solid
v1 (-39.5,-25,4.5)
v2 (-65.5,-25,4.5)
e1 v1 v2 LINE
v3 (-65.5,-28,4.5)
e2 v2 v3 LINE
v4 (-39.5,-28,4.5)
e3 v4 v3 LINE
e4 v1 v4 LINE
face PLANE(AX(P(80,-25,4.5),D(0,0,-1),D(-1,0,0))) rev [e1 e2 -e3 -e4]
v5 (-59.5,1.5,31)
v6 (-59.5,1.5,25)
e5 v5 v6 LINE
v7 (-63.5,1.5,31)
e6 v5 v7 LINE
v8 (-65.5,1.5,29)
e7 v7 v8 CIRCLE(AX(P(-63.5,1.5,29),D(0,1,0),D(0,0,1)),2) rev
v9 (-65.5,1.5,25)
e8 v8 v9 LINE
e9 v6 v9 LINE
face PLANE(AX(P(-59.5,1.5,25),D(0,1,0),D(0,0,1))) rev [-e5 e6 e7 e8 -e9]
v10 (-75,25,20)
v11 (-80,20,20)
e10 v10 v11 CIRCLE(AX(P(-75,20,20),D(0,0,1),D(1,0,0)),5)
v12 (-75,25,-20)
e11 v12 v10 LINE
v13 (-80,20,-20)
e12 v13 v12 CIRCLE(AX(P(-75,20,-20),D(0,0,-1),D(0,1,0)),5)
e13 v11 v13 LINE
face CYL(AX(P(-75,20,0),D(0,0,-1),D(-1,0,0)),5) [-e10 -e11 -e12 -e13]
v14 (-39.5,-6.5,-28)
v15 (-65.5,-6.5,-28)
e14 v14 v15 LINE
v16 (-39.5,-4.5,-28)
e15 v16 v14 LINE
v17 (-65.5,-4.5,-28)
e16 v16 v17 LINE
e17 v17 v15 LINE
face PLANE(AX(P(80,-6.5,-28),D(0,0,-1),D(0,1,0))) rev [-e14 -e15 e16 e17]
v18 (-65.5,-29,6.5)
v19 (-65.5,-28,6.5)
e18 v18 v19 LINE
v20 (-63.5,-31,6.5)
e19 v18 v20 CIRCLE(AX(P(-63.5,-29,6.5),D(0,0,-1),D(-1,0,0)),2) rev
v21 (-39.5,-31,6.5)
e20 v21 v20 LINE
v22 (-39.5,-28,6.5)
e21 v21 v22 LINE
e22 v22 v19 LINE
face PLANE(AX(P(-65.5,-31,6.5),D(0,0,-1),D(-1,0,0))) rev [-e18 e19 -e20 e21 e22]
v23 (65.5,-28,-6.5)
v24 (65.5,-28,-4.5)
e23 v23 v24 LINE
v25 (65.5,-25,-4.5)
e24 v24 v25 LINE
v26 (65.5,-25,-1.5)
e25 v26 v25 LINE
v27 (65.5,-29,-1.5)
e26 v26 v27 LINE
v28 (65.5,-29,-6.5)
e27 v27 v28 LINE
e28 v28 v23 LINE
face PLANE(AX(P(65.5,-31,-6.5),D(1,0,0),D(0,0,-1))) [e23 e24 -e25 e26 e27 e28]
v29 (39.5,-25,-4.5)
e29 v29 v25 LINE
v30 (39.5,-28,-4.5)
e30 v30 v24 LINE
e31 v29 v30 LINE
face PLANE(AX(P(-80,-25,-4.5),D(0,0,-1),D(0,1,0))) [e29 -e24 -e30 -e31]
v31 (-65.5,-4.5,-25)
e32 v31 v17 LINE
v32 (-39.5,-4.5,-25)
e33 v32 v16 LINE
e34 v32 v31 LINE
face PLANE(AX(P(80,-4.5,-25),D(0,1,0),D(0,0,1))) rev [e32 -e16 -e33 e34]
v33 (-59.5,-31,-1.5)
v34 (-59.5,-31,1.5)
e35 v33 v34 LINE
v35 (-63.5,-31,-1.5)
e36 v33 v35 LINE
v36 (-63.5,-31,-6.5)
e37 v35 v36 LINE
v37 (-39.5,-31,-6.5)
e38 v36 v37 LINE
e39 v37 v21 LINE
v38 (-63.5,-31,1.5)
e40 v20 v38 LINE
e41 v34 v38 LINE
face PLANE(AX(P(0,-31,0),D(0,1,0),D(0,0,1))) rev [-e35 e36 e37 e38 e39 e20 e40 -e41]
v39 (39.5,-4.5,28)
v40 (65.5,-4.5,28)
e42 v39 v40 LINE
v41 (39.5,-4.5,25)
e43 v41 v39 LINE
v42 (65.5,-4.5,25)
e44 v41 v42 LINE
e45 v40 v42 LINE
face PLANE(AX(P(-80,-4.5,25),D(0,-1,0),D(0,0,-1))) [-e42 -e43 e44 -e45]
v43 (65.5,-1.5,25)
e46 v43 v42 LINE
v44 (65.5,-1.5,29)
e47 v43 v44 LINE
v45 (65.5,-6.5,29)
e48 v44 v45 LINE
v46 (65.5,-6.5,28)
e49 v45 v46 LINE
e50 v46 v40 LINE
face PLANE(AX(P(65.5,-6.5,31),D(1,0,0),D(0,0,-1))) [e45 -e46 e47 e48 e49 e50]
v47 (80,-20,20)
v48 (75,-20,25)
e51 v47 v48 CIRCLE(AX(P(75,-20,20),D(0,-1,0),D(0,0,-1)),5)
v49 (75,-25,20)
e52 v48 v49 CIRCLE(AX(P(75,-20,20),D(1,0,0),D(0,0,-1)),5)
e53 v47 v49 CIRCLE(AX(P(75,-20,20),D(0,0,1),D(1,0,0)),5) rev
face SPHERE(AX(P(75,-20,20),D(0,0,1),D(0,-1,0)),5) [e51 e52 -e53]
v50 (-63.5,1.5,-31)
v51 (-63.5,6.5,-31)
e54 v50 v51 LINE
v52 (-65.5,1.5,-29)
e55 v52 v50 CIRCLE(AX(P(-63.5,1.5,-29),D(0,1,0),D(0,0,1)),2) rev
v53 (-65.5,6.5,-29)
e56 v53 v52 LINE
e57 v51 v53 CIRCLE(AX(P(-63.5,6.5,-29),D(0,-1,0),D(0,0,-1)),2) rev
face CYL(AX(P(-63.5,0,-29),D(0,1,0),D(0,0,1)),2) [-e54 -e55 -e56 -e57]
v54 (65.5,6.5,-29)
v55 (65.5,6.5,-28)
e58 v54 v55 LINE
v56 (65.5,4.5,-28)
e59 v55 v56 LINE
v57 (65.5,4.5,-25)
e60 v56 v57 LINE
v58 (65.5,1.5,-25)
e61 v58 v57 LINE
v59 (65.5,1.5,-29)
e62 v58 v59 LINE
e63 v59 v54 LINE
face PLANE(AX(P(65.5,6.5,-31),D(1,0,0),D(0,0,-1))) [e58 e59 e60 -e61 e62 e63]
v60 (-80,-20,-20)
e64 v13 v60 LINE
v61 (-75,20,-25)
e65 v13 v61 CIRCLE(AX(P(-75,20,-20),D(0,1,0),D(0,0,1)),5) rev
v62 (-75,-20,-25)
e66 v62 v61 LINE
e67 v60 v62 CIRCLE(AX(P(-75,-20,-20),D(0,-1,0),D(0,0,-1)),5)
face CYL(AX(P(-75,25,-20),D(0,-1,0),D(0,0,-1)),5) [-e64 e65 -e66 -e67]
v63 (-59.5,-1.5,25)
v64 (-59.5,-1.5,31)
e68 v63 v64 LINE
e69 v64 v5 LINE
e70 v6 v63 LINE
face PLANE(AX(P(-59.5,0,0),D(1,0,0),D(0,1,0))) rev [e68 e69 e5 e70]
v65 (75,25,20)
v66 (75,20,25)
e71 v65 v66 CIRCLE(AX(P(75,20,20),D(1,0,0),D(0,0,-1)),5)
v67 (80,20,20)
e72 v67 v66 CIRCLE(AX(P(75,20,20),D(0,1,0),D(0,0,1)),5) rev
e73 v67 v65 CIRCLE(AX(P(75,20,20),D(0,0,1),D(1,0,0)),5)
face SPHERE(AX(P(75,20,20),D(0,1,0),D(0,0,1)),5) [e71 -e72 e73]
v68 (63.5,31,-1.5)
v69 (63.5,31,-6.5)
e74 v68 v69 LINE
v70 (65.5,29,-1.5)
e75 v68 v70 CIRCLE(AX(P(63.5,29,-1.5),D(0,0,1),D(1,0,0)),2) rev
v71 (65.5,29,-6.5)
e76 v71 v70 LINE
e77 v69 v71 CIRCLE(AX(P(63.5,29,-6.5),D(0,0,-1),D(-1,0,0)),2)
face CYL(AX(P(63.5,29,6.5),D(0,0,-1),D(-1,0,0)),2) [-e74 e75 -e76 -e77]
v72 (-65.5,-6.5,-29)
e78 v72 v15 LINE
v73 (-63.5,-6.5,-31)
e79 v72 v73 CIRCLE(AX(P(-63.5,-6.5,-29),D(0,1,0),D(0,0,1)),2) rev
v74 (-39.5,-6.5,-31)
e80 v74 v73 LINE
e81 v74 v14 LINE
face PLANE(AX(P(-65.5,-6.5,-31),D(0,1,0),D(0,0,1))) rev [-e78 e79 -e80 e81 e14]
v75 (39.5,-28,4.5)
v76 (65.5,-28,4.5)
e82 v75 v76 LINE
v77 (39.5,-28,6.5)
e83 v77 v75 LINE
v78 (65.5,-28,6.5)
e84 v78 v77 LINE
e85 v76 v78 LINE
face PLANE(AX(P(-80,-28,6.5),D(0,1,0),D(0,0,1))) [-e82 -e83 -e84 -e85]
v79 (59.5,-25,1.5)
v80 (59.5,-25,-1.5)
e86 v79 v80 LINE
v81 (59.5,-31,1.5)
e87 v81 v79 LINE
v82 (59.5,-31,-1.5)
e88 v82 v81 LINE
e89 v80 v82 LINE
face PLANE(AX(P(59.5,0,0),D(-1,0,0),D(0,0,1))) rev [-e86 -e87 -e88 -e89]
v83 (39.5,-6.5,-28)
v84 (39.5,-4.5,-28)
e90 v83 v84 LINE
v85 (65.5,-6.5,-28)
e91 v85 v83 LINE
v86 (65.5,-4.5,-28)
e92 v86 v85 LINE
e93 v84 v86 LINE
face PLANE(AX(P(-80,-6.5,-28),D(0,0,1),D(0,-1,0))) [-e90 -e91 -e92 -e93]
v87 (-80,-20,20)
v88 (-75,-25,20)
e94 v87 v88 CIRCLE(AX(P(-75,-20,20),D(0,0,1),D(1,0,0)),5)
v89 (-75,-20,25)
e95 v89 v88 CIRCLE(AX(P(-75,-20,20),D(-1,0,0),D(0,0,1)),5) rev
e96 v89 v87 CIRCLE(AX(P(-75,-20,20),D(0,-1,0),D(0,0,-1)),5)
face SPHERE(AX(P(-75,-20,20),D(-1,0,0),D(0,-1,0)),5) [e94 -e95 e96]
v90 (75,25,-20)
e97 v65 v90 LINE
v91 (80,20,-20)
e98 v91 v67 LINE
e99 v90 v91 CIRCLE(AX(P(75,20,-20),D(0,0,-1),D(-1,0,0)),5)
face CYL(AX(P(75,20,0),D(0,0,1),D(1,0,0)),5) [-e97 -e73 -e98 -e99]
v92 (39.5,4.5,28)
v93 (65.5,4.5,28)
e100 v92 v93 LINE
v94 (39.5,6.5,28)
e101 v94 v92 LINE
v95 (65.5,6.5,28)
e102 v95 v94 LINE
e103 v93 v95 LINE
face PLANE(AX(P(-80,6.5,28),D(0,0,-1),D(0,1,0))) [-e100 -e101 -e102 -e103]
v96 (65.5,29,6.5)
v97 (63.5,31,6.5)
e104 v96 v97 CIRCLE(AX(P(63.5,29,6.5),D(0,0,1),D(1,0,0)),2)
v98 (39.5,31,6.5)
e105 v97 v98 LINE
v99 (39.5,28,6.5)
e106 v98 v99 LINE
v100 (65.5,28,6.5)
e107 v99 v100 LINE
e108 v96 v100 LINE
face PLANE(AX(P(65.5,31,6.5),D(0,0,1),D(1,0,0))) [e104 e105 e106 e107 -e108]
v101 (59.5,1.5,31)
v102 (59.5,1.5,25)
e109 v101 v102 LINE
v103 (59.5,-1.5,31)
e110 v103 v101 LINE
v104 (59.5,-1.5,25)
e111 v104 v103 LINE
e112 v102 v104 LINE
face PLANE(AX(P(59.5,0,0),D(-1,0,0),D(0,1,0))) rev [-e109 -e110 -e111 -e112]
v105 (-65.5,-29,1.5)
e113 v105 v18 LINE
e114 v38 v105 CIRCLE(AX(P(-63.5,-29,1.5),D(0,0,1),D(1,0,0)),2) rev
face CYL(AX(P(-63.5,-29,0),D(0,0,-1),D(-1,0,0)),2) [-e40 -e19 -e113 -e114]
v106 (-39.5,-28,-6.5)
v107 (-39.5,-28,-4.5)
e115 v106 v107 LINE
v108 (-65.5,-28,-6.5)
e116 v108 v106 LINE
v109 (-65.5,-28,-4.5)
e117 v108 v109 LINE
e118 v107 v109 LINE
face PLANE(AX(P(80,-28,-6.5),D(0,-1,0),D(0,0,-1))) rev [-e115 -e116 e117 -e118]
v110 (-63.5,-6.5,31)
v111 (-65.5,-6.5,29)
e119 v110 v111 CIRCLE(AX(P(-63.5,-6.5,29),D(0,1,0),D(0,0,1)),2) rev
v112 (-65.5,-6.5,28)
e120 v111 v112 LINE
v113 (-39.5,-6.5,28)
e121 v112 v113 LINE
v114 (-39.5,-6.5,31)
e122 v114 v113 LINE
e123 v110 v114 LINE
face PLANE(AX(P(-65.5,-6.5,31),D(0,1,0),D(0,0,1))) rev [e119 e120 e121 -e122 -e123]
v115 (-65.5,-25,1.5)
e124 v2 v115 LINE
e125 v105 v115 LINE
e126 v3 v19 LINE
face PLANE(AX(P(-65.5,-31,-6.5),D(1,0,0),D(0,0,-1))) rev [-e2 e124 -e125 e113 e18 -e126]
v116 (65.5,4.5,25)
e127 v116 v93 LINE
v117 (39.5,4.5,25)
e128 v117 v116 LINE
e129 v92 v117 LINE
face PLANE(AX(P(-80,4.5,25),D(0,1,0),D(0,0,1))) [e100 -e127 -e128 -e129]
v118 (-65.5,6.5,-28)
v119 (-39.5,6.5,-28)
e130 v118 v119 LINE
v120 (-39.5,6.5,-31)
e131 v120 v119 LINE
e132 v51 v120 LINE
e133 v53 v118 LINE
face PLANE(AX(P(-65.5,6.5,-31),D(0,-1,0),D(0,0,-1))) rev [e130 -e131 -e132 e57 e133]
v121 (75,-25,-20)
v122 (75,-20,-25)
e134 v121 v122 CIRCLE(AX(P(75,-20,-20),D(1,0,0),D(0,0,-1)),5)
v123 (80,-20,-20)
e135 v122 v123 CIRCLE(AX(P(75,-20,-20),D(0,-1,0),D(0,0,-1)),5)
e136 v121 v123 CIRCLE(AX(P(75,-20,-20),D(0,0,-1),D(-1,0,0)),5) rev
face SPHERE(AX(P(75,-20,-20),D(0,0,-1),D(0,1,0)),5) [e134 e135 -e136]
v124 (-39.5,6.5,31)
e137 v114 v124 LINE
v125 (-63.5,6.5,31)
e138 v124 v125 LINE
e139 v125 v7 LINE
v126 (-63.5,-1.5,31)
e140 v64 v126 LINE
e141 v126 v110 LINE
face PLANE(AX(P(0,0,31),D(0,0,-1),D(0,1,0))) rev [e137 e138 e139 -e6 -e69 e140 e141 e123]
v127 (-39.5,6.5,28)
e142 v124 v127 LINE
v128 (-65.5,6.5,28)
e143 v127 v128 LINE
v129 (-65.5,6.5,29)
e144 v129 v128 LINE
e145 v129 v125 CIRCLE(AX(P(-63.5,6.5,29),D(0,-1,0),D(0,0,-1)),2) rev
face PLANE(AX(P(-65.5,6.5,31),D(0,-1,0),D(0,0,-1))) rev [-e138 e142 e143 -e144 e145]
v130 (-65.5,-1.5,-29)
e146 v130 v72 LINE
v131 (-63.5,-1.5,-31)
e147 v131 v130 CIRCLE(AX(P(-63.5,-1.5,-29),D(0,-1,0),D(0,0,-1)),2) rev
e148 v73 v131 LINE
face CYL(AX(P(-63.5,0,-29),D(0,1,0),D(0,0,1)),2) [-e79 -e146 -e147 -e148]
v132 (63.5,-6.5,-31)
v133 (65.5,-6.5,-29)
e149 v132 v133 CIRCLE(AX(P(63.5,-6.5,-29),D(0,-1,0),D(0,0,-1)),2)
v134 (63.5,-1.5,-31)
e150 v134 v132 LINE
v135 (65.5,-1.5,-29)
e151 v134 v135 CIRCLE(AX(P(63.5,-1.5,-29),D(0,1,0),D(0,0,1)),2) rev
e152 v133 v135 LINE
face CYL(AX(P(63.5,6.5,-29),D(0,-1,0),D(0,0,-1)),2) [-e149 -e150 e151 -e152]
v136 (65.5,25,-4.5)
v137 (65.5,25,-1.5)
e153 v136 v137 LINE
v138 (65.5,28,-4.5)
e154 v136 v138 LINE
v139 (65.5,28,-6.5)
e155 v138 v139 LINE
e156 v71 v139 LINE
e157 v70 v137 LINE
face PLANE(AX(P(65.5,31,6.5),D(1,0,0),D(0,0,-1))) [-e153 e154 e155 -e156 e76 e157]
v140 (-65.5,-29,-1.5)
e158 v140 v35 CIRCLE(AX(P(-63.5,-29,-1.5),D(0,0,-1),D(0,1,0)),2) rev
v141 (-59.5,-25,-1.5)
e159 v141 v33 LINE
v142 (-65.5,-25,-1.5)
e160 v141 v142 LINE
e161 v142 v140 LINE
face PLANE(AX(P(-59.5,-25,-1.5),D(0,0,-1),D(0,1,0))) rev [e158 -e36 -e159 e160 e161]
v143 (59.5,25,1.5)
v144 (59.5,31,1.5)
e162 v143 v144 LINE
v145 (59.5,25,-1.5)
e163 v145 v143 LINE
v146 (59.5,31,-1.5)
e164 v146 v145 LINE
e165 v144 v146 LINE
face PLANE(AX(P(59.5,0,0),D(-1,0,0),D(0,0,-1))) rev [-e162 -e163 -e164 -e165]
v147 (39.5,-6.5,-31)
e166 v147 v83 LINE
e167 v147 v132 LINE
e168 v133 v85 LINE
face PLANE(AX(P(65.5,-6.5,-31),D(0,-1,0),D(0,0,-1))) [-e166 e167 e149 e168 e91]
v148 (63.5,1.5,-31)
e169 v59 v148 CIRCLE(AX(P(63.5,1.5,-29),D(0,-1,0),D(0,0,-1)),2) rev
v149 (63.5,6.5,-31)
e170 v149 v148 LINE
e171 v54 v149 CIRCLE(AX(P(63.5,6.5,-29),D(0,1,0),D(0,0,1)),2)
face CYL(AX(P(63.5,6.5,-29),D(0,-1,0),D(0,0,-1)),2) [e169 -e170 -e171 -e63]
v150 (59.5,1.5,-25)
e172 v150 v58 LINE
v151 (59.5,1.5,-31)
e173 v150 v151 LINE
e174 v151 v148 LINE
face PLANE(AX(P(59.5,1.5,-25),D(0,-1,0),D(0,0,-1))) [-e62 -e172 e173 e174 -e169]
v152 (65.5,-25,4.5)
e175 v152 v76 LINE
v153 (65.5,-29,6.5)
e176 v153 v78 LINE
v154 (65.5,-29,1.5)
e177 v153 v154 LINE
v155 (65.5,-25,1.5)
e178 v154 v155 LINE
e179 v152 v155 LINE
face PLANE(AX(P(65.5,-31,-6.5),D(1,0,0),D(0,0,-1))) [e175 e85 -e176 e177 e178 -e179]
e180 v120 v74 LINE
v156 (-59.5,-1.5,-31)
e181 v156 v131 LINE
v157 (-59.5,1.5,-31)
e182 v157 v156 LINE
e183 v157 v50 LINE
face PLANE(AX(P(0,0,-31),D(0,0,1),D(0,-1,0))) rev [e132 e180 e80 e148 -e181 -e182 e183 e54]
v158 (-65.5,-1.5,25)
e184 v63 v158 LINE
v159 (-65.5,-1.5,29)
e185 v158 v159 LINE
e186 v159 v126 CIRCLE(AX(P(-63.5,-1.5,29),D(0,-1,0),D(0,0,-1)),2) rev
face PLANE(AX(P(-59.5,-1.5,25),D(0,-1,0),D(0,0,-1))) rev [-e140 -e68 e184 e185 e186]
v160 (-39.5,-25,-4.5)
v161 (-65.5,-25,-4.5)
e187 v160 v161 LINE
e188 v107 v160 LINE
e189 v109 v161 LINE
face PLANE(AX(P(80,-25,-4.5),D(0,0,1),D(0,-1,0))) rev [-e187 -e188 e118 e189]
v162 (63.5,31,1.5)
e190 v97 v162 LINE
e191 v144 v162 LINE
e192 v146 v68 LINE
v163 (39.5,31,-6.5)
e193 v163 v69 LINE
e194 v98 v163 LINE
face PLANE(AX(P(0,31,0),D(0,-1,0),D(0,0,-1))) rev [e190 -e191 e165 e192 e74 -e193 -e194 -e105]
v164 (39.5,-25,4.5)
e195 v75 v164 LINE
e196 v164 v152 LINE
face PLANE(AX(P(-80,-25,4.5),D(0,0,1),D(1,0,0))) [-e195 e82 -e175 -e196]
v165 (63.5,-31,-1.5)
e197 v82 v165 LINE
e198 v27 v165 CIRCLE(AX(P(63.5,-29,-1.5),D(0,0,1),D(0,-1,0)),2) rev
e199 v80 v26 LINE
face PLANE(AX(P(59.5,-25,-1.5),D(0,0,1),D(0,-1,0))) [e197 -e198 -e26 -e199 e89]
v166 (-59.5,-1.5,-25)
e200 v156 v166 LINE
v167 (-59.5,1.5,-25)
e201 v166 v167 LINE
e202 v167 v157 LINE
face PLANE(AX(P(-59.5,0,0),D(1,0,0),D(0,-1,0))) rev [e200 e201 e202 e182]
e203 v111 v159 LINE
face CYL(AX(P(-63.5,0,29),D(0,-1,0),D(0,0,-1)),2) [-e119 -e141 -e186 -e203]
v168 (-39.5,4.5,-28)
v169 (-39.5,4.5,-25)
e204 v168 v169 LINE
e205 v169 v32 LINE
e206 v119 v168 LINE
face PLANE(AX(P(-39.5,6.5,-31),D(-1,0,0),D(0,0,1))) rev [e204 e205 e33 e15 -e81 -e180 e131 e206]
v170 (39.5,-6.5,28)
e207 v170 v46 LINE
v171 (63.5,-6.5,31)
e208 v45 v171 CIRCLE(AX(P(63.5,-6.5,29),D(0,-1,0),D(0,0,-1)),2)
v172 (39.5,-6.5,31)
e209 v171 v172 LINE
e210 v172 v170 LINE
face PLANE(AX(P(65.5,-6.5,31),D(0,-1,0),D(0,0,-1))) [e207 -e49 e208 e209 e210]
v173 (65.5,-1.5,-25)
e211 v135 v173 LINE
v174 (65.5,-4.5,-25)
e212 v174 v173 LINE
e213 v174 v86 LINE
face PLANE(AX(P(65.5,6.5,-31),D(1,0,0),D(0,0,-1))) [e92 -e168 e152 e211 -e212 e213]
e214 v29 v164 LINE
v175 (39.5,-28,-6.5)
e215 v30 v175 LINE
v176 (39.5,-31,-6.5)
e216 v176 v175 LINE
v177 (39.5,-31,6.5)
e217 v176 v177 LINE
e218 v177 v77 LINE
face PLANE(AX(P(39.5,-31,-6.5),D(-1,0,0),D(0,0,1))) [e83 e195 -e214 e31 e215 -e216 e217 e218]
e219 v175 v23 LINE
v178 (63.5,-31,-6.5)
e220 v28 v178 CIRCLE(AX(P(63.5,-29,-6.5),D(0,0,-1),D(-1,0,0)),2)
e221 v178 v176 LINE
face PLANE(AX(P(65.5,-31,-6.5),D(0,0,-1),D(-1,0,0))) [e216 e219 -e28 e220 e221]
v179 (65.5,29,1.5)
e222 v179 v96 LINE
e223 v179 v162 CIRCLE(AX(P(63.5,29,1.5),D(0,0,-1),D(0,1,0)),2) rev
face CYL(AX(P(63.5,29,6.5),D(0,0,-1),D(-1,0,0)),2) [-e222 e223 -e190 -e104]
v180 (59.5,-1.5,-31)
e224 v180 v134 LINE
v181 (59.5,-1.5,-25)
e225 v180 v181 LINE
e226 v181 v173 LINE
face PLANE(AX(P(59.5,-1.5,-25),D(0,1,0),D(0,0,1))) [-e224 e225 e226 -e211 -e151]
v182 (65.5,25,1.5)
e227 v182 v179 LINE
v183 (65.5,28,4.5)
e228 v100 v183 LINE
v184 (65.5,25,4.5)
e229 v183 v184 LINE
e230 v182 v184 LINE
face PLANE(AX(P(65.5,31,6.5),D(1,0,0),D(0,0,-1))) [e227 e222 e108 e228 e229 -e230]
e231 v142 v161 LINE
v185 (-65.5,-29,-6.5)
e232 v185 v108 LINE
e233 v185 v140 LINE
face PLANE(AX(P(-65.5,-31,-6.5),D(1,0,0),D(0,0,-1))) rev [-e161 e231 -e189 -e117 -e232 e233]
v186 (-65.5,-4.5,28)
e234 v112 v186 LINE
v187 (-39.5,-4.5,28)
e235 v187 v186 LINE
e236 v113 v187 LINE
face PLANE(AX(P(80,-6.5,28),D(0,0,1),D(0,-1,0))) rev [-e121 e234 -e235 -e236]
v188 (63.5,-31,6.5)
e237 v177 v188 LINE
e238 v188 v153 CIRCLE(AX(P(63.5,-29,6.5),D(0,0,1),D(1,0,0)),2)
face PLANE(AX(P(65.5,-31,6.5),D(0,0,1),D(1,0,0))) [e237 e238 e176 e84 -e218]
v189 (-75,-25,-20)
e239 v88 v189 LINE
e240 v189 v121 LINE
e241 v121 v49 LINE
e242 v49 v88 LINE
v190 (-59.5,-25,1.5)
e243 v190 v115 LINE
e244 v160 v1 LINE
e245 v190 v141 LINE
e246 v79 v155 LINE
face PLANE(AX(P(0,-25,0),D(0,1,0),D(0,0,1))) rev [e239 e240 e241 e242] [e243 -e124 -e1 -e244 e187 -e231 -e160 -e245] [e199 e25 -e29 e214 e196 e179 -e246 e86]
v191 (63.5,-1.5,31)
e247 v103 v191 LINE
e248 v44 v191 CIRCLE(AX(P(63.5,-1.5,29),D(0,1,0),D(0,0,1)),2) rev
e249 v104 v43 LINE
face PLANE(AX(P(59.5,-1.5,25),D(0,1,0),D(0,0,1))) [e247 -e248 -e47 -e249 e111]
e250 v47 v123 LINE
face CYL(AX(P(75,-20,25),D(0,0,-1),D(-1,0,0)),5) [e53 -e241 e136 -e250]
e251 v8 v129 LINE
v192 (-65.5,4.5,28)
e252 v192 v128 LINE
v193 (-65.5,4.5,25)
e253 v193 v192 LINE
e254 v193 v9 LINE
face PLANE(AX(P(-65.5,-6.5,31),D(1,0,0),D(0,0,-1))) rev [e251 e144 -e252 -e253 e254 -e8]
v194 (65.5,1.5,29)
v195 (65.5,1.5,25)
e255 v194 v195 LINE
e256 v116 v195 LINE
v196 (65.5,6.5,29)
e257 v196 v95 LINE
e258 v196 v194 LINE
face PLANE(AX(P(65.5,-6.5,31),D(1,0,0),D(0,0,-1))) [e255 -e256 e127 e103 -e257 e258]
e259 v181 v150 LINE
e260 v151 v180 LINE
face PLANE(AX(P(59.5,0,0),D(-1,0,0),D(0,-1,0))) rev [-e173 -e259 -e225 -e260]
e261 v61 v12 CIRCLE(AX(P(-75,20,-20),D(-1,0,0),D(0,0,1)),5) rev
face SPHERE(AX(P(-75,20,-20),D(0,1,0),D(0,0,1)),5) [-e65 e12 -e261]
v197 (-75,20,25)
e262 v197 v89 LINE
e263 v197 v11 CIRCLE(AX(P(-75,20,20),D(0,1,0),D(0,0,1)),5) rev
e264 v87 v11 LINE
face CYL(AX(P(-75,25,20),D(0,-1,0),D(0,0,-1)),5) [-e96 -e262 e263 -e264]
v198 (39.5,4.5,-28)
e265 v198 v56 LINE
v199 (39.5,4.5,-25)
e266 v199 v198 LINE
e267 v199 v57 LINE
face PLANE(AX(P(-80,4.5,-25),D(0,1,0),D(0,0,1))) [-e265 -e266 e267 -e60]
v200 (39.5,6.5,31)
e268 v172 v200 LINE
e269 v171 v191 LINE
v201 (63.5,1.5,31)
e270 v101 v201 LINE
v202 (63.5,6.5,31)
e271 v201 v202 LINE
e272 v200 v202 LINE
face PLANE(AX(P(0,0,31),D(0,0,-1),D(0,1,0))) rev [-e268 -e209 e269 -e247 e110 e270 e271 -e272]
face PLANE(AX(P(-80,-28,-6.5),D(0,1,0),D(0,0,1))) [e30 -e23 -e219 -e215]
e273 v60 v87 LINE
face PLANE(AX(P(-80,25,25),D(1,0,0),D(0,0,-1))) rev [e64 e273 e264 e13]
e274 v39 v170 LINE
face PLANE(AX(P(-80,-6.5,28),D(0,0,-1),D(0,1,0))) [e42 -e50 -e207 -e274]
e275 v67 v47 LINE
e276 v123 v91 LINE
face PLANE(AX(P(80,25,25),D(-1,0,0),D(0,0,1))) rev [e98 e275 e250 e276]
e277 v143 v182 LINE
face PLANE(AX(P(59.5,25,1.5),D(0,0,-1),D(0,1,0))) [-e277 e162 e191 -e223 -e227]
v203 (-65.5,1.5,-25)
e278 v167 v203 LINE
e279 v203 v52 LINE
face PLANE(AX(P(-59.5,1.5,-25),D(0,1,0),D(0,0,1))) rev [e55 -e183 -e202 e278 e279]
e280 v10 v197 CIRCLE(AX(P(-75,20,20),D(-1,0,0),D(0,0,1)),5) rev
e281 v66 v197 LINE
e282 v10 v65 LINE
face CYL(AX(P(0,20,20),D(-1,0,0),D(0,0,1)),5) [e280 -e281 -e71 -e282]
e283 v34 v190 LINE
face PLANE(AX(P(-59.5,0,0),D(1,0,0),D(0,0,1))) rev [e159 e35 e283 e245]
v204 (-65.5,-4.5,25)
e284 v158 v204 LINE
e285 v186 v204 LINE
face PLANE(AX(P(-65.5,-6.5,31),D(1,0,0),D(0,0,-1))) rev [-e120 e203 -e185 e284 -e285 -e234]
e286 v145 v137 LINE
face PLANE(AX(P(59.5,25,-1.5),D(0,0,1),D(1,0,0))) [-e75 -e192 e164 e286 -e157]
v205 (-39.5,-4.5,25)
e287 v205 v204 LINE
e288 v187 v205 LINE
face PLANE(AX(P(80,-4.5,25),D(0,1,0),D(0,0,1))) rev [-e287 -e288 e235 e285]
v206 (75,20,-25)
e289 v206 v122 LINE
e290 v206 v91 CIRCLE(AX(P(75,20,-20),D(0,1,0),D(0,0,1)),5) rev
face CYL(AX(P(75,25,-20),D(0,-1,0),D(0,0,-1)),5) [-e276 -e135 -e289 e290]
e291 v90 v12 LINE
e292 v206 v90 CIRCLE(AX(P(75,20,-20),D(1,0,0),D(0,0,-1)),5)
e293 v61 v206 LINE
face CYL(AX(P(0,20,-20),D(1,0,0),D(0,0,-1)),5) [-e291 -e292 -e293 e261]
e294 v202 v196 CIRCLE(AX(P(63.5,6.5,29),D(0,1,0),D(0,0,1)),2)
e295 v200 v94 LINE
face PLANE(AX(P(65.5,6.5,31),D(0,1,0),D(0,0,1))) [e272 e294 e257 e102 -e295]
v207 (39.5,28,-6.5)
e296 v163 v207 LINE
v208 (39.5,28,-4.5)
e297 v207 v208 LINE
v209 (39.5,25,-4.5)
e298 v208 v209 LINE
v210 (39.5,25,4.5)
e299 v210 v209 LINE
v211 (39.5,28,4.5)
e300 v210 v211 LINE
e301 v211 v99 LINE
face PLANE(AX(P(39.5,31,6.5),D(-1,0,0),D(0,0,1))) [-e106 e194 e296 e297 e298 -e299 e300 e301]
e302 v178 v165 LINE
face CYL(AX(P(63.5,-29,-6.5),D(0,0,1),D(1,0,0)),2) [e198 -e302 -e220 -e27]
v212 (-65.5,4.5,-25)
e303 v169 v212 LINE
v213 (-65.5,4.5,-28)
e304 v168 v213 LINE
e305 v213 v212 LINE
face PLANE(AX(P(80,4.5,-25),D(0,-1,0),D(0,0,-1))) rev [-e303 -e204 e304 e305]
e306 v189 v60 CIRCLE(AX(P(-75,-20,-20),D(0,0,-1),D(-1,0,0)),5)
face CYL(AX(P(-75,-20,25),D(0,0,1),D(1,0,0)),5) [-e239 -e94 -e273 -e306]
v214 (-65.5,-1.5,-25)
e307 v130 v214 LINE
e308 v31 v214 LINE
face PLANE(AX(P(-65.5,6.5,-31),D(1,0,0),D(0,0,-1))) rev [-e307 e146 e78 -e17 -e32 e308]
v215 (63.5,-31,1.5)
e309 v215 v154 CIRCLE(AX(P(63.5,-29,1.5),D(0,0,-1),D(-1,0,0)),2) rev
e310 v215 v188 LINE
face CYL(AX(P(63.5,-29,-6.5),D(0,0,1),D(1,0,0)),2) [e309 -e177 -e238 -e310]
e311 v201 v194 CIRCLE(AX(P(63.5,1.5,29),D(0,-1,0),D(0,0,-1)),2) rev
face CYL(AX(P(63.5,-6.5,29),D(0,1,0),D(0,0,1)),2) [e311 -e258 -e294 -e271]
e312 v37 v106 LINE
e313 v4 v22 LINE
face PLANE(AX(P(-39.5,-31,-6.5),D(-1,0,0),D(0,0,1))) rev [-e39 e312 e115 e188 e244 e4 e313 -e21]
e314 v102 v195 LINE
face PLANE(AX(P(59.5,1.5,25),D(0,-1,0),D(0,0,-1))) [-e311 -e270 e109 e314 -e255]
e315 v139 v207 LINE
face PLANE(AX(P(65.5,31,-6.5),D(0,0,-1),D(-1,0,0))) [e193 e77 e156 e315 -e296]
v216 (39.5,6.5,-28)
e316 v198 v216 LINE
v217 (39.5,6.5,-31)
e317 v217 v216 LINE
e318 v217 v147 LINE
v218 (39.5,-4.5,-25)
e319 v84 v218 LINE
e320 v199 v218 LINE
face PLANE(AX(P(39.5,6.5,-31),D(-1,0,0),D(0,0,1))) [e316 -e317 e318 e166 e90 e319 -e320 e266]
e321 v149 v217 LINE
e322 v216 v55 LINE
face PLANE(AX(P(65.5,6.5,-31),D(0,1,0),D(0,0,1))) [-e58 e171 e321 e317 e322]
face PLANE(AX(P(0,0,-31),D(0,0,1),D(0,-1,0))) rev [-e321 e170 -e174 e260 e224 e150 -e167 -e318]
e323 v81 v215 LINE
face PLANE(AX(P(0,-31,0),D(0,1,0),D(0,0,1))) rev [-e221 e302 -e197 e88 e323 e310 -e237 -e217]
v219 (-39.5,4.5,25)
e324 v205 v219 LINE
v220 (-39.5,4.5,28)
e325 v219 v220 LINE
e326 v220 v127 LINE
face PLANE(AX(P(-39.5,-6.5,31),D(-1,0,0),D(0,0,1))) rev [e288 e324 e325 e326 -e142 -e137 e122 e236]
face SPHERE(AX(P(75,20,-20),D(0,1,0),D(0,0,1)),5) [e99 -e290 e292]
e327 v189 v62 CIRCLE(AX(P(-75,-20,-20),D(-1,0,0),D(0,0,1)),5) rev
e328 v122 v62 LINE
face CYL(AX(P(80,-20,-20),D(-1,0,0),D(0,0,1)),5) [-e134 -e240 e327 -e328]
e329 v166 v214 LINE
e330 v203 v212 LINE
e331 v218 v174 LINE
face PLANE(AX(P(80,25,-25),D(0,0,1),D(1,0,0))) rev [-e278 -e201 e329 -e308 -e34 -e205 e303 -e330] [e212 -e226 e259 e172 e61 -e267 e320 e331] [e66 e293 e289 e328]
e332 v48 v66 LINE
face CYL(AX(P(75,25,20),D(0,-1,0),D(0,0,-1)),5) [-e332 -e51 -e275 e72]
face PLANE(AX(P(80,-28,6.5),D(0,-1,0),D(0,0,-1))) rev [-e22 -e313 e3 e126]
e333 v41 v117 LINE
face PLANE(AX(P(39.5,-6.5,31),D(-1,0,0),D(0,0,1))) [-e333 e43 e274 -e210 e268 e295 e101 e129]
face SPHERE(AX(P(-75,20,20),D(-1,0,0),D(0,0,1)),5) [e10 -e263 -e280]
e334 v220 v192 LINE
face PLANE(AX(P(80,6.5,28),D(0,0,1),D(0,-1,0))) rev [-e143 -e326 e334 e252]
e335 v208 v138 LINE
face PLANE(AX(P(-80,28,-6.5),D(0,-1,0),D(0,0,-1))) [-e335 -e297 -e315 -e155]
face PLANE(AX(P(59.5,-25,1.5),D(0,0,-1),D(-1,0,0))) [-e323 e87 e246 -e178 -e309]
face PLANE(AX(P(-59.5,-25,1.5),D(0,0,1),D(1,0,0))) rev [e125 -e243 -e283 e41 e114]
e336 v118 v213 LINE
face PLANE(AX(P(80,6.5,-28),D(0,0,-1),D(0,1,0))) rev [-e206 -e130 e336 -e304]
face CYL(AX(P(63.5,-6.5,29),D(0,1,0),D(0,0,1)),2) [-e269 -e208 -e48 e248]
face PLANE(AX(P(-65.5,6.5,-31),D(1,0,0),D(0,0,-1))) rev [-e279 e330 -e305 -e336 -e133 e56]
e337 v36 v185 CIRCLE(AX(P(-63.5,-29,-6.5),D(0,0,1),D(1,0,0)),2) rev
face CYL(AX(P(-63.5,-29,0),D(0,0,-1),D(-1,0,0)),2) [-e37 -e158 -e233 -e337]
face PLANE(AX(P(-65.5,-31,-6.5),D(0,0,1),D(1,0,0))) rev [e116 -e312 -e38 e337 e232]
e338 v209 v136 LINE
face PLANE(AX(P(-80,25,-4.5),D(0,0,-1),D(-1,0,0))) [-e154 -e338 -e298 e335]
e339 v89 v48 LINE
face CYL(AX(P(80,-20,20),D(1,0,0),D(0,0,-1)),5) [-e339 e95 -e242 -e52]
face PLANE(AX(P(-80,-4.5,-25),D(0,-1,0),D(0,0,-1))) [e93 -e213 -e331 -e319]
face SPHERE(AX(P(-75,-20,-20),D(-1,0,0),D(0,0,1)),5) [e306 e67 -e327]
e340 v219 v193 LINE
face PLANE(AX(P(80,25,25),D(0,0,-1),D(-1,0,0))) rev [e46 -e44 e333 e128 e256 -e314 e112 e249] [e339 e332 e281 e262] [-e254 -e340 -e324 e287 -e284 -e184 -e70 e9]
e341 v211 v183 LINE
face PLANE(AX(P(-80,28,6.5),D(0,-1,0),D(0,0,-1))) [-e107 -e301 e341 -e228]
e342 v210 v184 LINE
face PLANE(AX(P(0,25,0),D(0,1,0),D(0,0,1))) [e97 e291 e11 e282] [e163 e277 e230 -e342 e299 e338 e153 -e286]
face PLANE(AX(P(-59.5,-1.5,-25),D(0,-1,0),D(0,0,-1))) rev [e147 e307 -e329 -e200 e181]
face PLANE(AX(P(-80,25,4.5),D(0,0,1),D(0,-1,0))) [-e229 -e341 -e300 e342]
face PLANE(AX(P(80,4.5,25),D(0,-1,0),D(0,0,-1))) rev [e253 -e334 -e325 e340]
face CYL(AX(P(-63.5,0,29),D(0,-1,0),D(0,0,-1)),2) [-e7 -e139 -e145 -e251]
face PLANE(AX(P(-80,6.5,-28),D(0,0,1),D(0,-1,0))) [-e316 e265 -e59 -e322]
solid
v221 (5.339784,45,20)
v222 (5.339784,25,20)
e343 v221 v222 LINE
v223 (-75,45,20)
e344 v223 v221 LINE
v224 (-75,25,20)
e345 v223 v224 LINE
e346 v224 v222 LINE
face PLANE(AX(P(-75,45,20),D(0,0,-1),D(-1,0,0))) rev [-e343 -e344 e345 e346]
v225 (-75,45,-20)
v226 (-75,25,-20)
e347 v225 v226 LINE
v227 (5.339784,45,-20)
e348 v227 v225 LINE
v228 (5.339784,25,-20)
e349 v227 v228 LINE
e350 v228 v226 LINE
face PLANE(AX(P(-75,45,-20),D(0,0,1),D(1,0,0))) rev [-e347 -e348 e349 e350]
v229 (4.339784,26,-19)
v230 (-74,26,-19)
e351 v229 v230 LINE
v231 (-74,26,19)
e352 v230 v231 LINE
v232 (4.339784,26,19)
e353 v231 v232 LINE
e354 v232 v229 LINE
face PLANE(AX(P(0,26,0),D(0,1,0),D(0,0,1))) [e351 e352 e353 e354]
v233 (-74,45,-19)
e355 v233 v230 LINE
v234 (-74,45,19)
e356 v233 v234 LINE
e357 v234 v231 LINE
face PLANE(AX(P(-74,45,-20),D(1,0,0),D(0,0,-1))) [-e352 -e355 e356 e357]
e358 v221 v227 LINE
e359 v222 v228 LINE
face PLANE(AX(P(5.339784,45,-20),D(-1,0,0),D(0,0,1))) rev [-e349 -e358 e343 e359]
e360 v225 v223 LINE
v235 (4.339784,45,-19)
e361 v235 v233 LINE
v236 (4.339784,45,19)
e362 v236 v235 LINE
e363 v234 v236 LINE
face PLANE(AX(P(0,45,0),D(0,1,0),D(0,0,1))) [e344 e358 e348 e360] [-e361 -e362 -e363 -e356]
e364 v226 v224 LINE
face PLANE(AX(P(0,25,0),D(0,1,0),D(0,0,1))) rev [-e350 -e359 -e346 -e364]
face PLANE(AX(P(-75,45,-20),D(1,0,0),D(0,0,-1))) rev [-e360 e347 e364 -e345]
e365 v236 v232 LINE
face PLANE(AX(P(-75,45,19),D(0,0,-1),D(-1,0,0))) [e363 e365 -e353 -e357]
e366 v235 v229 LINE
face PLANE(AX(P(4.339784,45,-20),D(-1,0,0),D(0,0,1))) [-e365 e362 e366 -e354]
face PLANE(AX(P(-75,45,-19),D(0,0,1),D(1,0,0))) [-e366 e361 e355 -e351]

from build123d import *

# Parameters (mm, degrees)
SKETCH1_W               = 160
SKETCH1_H               = 50
BOSS_EXTRUDE1_DEPTH     = 25
SKETCH2_W               = 26
SKETCH2_H               = 13
CONNECTOR_BASE_DEPTH    = 6
SKETCH3_W               = 2
SKETCH3_H               = 3
DOVETAIL_CUT_DEPTH      = 151.851748415
FILLET1_R               = 2
SKETCH4_W               = 3
SKETCH4_H               = 6
CUT_EXTRUDE1_DEPTH      = 6
CIRPATTERN1_START       = -4.5
CIRPATTERN1_OUTLINE_W   = 20
CIRPATTERN1_OUTLINE_H   = 6
CIRPATTERN1_DEPTH       = 9
CIRPATTERN1_START_2     = -6.5
CIRPATTERN1_2_OUTLINE_W = 20
CIRPATTERN1_2_OUTLINE_H = 3
CIRPATTERN1_2_DEPTH     = 13
CIRPATTERN1_3_DEPTH     = 3
CIRPATTERN1_START_3     = 1.5
CIRPATTERN1_4_DEPTH     = 3
CIRPATTERN1_5_DEPTH     = 2
CIRPATTERN1_START_4     = 4.5
CIRPATTERN1_6_DEPTH     = 2
CIRPATTERN1_7_OUTLINE_W = 20
CIRPATTERN1_7_OUTLINE_H = 6
CIRPATTERN1_7_DEPTH     = 9
CIRPATTERN1_8_OUTLINE_W = 20
CIRPATTERN1_8_OUTLINE_H = 3
CIRPATTERN1_8_DEPTH     = 13
CIRPATTERN1_9_DEPTH     = 3
CIRPATTERN1_10_DEPTH    = 3
CIRPATTERN1_11_DEPTH    = 2
CIRPATTERN1_12_DEPTH    = 2
MIRROR1_START           = -4.5
MIRROR1_OUTLINE_W       = 20
MIRROR1_OUTLINE_H       = 6
MIRROR1_DEPTH           = 9
MIRROR1_START_2         = -6.5
MIRROR1_2_OUTLINE_W     = 20
MIRROR1_2_OUTLINE_H     = 3
MIRROR1_2_DEPTH         = 13
MIRROR1_3_DEPTH         = 3
MIRROR1_START_3         = 1.5
MIRROR1_4_DEPTH         = 3
MIRROR1_5_DEPTH         = 2
MIRROR1_START_4         = 4.5
MIRROR1_6_DEPTH         = 2
MIRROR1_7_OUTLINE_W     = 20
MIRROR1_7_OUTLINE_H     = 6
MIRROR1_7_DEPTH         = 9
MIRROR1_8_OUTLINE_W     = 20
MIRROR1_8_OUTLINE_H     = 3
MIRROR1_8_DEPTH         = 13
MIRROR1_9_DEPTH         = 3
MIRROR1_10_DEPTH        = 3
MIRROR1_11_DEPTH        = 2
MIRROR1_12_DEPTH        = 2
FILLET2_R               = 5
SKETCH5_W               = 26
SKETCH5_H               = 13
CUT_EXTRUDE2_DEPTH      = 103.454868113
SKETCH6_W               = 80.339783693
SKETCH6_H               = 40
BOSS_EXTRUDE2_DEPTH     = 20
SHELL1_T                = -1


# Read off the part's stored shape, not the designer's step: CirPattern1, Mirror1
with BuildPart() as part:
    # Sketch1 → Boss-Extrude1 (new, symmetric)
    with BuildSketch(Plane(origin=(0, 0, 0), x_dir=(1, 0, 0), z_dir=(0, 1, 0))):
        Rectangle(SKETCH1_W, SKETCH1_H)
    extrude(amount=BOSS_EXTRUDE1_DEPTH, both=True)

    # Sketch2 → connector base (add)
    with BuildSketch(Plane(origin=(0, 25, 0), x_dir=(1, 0, 0), z_dir=(0, 1, 0))):
        with Locations((-52.5, 0)):
            Rectangle(SKETCH2_W, SKETCH2_H)
    extrude(amount=CONNECTOR_BASE_DEPTH)

    # Sketch3 → dovetail cut (cut, through all)
    with BuildSketch(Plane.ZY.offset(65.5)):
        with Locations((5.5, 26.5)):
            Rectangle(SKETCH3_W, SKETCH3_H)
        with Locations((-5.5, 26.5)):
            Rectangle(SKETCH3_W, SKETCH3_H)
    extrude(amount=-DOVETAIL_CUT_DEPTH, mode=Mode.SUBTRACT)

    # Fillet1
    fillet1_edges = [part.edges().sort_by_distance(p)[0] for p in [
        (-65.5, 31, 0),
    ]]
    fillet(fillet1_edges, radius=FILLET1_R)

    # Sketch4 → Cut-Extrude1 (cut)
    with BuildSketch(Plane.ZY.offset(65.5)):
        with Locations((0, 28)):
            Rectangle(SKETCH4_W, SKETCH4_H)
    extrude(amount=-CUT_EXTRUDE1_DEPTH, mode=Mode.SUBTRACT)

    # CirPattern1 outline → CirPattern1 (add)
    with BuildSketch(Plane(origin=(0, 0, 0), x_dir=(1, 0, 0), z_dir=(0, 1, 0)).offset(CIRPATTERN1_START)):
        with Locations((-49.5, 28)):
            Rectangle(CIRPATTERN1_OUTLINE_W, CIRPATTERN1_OUTLINE_H)
        with Locations((-49.5, -28)):
            Rectangle(CIRPATTERN1_OUTLINE_W, CIRPATTERN1_OUTLINE_H)
    extrude(amount=CIRPATTERN1_DEPTH)

    # CirPattern1 2 outline → CirPattern1 2 (add)
    with BuildSketch(Plane(origin=(0, 0, 0), x_dir=(1, 0, 0), z_dir=(0, 1, 0)).offset(CIRPATTERN1_START_2)):
        with Locations((-49.5, 29.5)):
            Rectangle(CIRPATTERN1_2_OUTLINE_W, CIRPATTERN1_2_OUTLINE_H)
        with Locations((-49.5, -29.5)):
            Rectangle(CIRPATTERN1_2_OUTLINE_W, CIRPATTERN1_2_OUTLINE_H)
    extrude(amount=CIRPATTERN1_2_DEPTH)

    # CirPattern1 3 outline → CirPattern1 3 (add)
    with BuildSketch(Plane(origin=(0, 0, 0), x_dir=(1, 0, 0), z_dir=(0, 1, 0)).offset(CIRPATTERN1_START)):
        with BuildLine():
            Line((-65.5, 25), (-59.5, 25))
            Line((-59.5, 25), (-59.5, 31))
            Line((-59.5, 31), (-63.5, 31))
            ThreePointArc((-63.5, 31), (-64.914213562, 30.414213562), (-65.5, 29))
            Line((-65.5, 29), (-65.5, 25))
        make_face()
        with BuildLine():
            ThreePointArc((-65.5, -29), (-64.914213562, -30.414213562), (-63.5, -31))
            Line((-63.5, -31), (-59.5, -31))
            Line((-59.5, -31), (-59.5, -25))
            Line((-59.5, -25), (-65.5, -25))
            Line((-65.5, -25), (-65.5, -29))
        make_face()
    extrude(amount=CIRPATTERN1_3_DEPTH)

    # CirPattern1 4 outline → CirPattern1 4 (add)
    with BuildSketch(Plane(origin=(0, 0, 0), x_dir=(1, 0, 0), z_dir=(0, 1, 0)).offset(CIRPATTERN1_START_3)):
        with BuildLine():
            Line((-65.5, 25), (-59.5, 25))
            Line((-59.5, 25), (-59.5, 31))
            Line((-59.5, 31), (-63.5, 31))
            ThreePointArc((-63.5, 31), (-64.914213562, 30.414213562), (-65.5, 29))
            Line((-65.5, 29), (-65.5, 25))
        make_face()
        with BuildLine():
            ThreePointArc((-65.5, -29), (-64.914213562, -30.414213562), (-63.5, -31))
            Line((-63.5, -31), (-59.5, -31))
            Line((-59.5, -31), (-59.5, -25))
            Line((-59.5, -25), (-65.5, -25))
            Line((-65.5, -25), (-65.5, -29))
        make_face()
    extrude(amount=CIRPATTERN1_4_DEPTH)

    # CirPattern1 5 outline → CirPattern1 5 (add)
    with BuildSketch(Plane(origin=(0, 0, 0), x_dir=(1, 0, 0), z_dir=(0, 1, 0)).offset(CIRPATTERN1_START_2)):
        with BuildLine():
            Line((-65.5, 29), (-65.5, 28))
            Line((-65.5, 28), (-59.5, 28))
            Line((-59.5, 28), (-59.5, 31))
            Line((-59.5, 31), (-63.5, 31))
            ThreePointArc((-63.5, 31), (-64.914213562, 30.414213562), (-65.5, 29))
        make_face()
        with BuildLine():
            Line((-65.5, -28), (-65.5, -29))
            ThreePointArc((-65.5, -29), (-64.914213562, -30.414213562), (-63.5, -31))
            Line((-63.5, -31), (-59.5, -31))
            Line((-59.5, -31), (-59.5, -28))
            Line((-59.5, -28), (-65.5, -28))
        make_face()
    extrude(amount=CIRPATTERN1_5_DEPTH)

    # CirPattern1 6 outline → CirPattern1 6 (add)
    with BuildSketch(Plane(origin=(0, 0, 0), x_dir=(1, 0, 0), z_dir=(0, 1, 0)).offset(CIRPATTERN1_START_4)):
        with BuildLine():
            Line((-65.5, 29), (-65.5, 28))
            Line((-65.5, 28), (-59.5, 28))
            Line((-59.5, 28), (-59.5, 31))
            Line((-59.5, 31), (-63.5, 31))
            ThreePointArc((-63.5, 31), (-64.914213562, 30.414213562), (-65.5, 29))
        make_face()
        with BuildLine():
            Line((-65.5, -28), (-65.5, -29))
            ThreePointArc((-65.5, -29), (-64.914213562, -30.414213562), (-63.5, -31))
            Line((-63.5, -31), (-59.5, -31))
            Line((-59.5, -31), (-59.5, -28))
            Line((-59.5, -28), (-65.5, -28))
        make_face()
    extrude(amount=CIRPATTERN1_6_DEPTH)

    # CirPattern1 7 outline → CirPattern1 7 (add)
    with BuildSketch(Plane.XY.offset(CIRPATTERN1_START)):
        with Locations((-49.5, -28)):
            Rectangle(CIRPATTERN1_7_OUTLINE_W, CIRPATTERN1_7_OUTLINE_H)
    extrude(amount=CIRPATTERN1_7_DEPTH)

    # CirPattern1 8 outline → CirPattern1 8 (add)
    with BuildSketch(Plane.XY.offset(CIRPATTERN1_START_2)):
        with Locations((-49.5, -29.5)):
            Rectangle(CIRPATTERN1_8_OUTLINE_W, CIRPATTERN1_8_OUTLINE_H)
    extrude(amount=CIRPATTERN1_8_DEPTH)

    # CirPattern1 9 outline → CirPattern1 9 (add)
    with BuildSketch(Plane.XY.offset(CIRPATTERN1_START)):
        with BuildLine():
            ThreePointArc((-65.5, -29), (-64.914213562, -30.414213562), (-63.5, -31))
            Line((-63.5, -31), (-59.5, -31))
            Line((-59.5, -31), (-59.5, -25))
            Line((-59.5, -25), (-65.5, -25))
            Line((-65.5, -25), (-65.5, -29))
        make_face()
    extrude(amount=CIRPATTERN1_9_DEPTH)

    # CirPattern1 10 outline → CirPattern1 10 (add)
    with BuildSketch(Plane.XY.offset(CIRPATTERN1_START_3)):
        with BuildLine():
            ThreePointArc((-65.5, -29), (-64.914213562, -30.414213562), (-63.5, -31))
            Line((-63.5, -31), (-59.5, -31))
            Line((-59.5, -31), (-59.5, -25))
            Line((-59.5, -25), (-65.5, -25))
            Line((-65.5, -25), (-65.5, -29))
        make_face()
    extrude(amount=CIRPATTERN1_10_DEPTH)

    # CirPattern1 11 outline → CirPattern1 11 (add)
    with BuildSketch(Plane.XY.offset(CIRPATTERN1_START_2)):
        with BuildLine():
            Line((-65.5, -28), (-65.5, -29))
            ThreePointArc((-65.5, -29), (-64.914213562, -30.414213562), (-63.5, -31))
            Line((-63.5, -31), (-59.5, -31))
            Line((-59.5, -31), (-59.5, -28))
            Line((-59.5, -28), (-65.5, -28))
        make_face()
    extrude(amount=CIRPATTERN1_11_DEPTH)

    # CirPattern1 12 outline → CirPattern1 12 (add)
    with BuildSketch(Plane.XY.offset(CIRPATTERN1_START_4)):
        with BuildLine():
            Line((-65.5, -28), (-65.5, -29))
            ThreePointArc((-65.5, -29), (-64.914213562, -30.414213562), (-63.5, -31))
            Line((-63.5, -31), (-59.5, -31))
            Line((-59.5, -31), (-59.5, -28))
            Line((-59.5, -28), (-65.5, -28))
        make_face()
    extrude(amount=CIRPATTERN1_12_DEPTH)

    # Mirror1 outline → Mirror1 (add)
    with BuildSketch(Plane.XY.offset(MIRROR1_START)):
        with Locations((49.5, 28)):
            Rectangle(MIRROR1_OUTLINE_W, MIRROR1_OUTLINE_H)
        with Locations((49.5, -28)):
            Rectangle(MIRROR1_OUTLINE_W, MIRROR1_OUTLINE_H)
    extrude(amount=MIRROR1_DEPTH)

    # Mirror1 2 outline → Mirror1 2 (add)
    with BuildSketch(Plane.XY.offset(MIRROR1_START_2)):
        with Locations((49.5, 29.5)):
            Rectangle(MIRROR1_2_OUTLINE_W, MIRROR1_2_OUTLINE_H)
        with Locations((49.5, -29.5)):
            Rectangle(MIRROR1_2_OUTLINE_W, MIRROR1_2_OUTLINE_H)
    extrude(amount=MIRROR1_2_DEPTH)

    # Mirror1 3 outline → Mirror1 3 (add)
    with BuildSketch(Plane.XY.offset(MIRROR1_START)):
        with BuildLine():
            Line((59.5, 25), (65.5, 25))
            Line((65.5, 25), (65.5, 29))
            ThreePointArc((65.5, 29), (64.914213562, 30.414213562), (63.5, 31))
            Line((63.5, 31), (59.5, 31))
            Line((59.5, 31), (59.5, 25))
        make_face()
        with BuildLine():
            ThreePointArc((63.5, -31), (64.914213562, -30.414213562), (65.5, -29))
            Line((65.5, -29), (65.5, -25))
            Line((65.5, -25), (59.5, -25))
            Line((59.5, -25), (59.5, -31))
            Line((59.5, -31), (63.5, -31))
        make_face()
    extrude(amount=MIRROR1_3_DEPTH)

    # Mirror1 4 outline → Mirror1 4 (add)
    with BuildSketch(Plane.XY.offset(MIRROR1_START_3)):
        with BuildLine():
            Line((59.5, 25), (65.5, 25))
            Line((65.5, 25), (65.5, 29))
            ThreePointArc((65.5, 29), (64.914213562, 30.414213562), (63.5, 31))
            Line((63.5, 31), (59.5, 31))
            Line((59.5, 31), (59.5, 25))
        make_face()
        with BuildLine():
            ThreePointArc((63.5, -31), (64.914213562, -30.414213562), (65.5, -29))
            Line((65.5, -29), (65.5, -25))
            Line((65.5, -25), (59.5, -25))
            Line((59.5, -25), (59.5, -31))
            Line((59.5, -31), (63.5, -31))
        make_face()
    extrude(amount=MIRROR1_4_DEPTH)

    # Mirror1 5 outline → Mirror1 5 (add)
    with BuildSketch(Plane.XY.offset(MIRROR1_START_2)):
        with BuildLine():
            Line((59.5, 28), (65.5, 28))
            Line((65.5, 28), (65.5, 29))
            ThreePointArc((65.5, 29), (64.914213562, 30.414213562), (63.5, 31))
            Line((63.5, 31), (59.5, 31))
            Line((59.5, 31), (59.5, 28))
        make_face()
        with BuildLine():
            ThreePointArc((63.5, -31), (64.914213562, -30.414213562), (65.5, -29))
            Line((65.5, -29), (65.5, -28))
            Line((65.5, -28), (59.5, -28))
            Line((59.5, -28), (59.5, -31))
            Line((59.5, -31), (63.5, -31))
        make_face()
    extrude(amount=MIRROR1_5_DEPTH)

    # Mirror1 6 outline → Mirror1 6 (add)
    with BuildSketch(Plane.XY.offset(MIRROR1_START_4)):
        with BuildLine():
            Line((59.5, 28), (65.5, 28))
            Line((65.5, 28), (65.5, 29))
            ThreePointArc((65.5, 29), (64.914213562, 30.414213562), (63.5, 31))
            Line((63.5, 31), (59.5, 31))
            Line((59.5, 31), (59.5, 28))
        make_face()
        with BuildLine():
            ThreePointArc((63.5, -31), (64.914213562, -30.414213562), (65.5, -29))
            Line((65.5, -29), (65.5, -28))
            Line((65.5, -28), (59.5, -28))
            Line((59.5, -28), (59.5, -31))
            Line((59.5, -31), (63.5, -31))
        make_face()
    extrude(amount=MIRROR1_6_DEPTH)

    # Mirror1 7 outline → Mirror1 7 (add)
    with BuildSketch(Plane(origin=(0, 0, 0), x_dir=(1, 0, 0), z_dir=(0, 1, 0)).offset(MIRROR1_START)):
        with Locations((49.5, 28)):
            Rectangle(MIRROR1_7_OUTLINE_W, MIRROR1_7_OUTLINE_H)
        with Locations((49.5, -28)):
            Rectangle(MIRROR1_7_OUTLINE_W, MIRROR1_7_OUTLINE_H)
    extrude(amount=MIRROR1_7_DEPTH)

    # Mirror1 8 outline → Mirror1 8 (add)
    with BuildSketch(Plane(origin=(0, 0, 0), x_dir=(1, 0, 0), z_dir=(0, 1, 0)).offset(MIRROR1_START_2)):
        with Locations((49.5, 29.5)):
            Rectangle(MIRROR1_8_OUTLINE_W, MIRROR1_8_OUTLINE_H)
        with Locations((49.5, -29.5)):
            Rectangle(MIRROR1_8_OUTLINE_W, MIRROR1_8_OUTLINE_H)
    extrude(amount=MIRROR1_8_DEPTH)

    # Mirror1 9 outline → Mirror1 9 (add)
    with BuildSketch(Plane(origin=(0, 0, 0), x_dir=(1, 0, 0), z_dir=(0, 1, 0)).offset(MIRROR1_START)):
        with BuildLine():
            Line((59.5, 25), (65.5, 25))
            Line((65.5, 25), (65.5, 29))
            ThreePointArc((65.5, 29), (64.914213562, 30.414213562), (63.5, 31))
            Line((63.5, 31), (59.5, 31))
            Line((59.5, 31), (59.5, 25))
        make_face()
        with BuildLine():
            ThreePointArc((63.5, -31), (64.914213562, -30.414213562), (65.5, -29))
            Line((65.5, -29), (65.5, -25))
            Line((65.5, -25), (59.5, -25))
            Line((59.5, -25), (59.5, -31))
            Line((59.5, -31), (63.5, -31))
        make_face()
    extrude(amount=MIRROR1_9_DEPTH)

    # Mirror1 10 outline → Mirror1 10 (add)
    with BuildSketch(Plane(origin=(0, 0, 0), x_dir=(1, 0, 0), z_dir=(0, 1, 0)).offset(MIRROR1_START_3)):
        with BuildLine():
            Line((59.5, 25), (65.5, 25))
            Line((65.5, 25), (65.5, 29))
            ThreePointArc((65.5, 29), (64.914213562, 30.414213562), (63.5, 31))
            Line((63.5, 31), (59.5, 31))
            Line((59.5, 31), (59.5, 25))
        make_face()
        with BuildLine():
            ThreePointArc((63.5, -31), (64.914213562, -30.414213562), (65.5, -29))
            Line((65.5, -29), (65.5, -25))
            Line((65.5, -25), (59.5, -25))
            Line((59.5, -25), (59.5, -31))
            Line((59.5, -31), (63.5, -31))
        make_face()
    extrude(amount=MIRROR1_10_DEPTH)

    # Mirror1 11 outline → Mirror1 11 (add)
    with BuildSketch(Plane(origin=(0, 0, 0), x_dir=(1, 0, 0), z_dir=(0, 1, 0)).offset(MIRROR1_START_2)):
        with BuildLine():
            Line((59.5, 28), (65.5, 28))
            Line((65.5, 28), (65.5, 29))
            ThreePointArc((65.5, 29), (64.914213562, 30.414213562), (63.5, 31))
            Line((63.5, 31), (59.5, 31))
            Line((59.5, 31), (59.5, 28))
        make_face()
        with BuildLine():
            ThreePointArc((63.5, -31), (64.914213562, -30.414213562), (65.5, -29))
            Line((65.5, -29), (65.5, -28))
            Line((65.5, -28), (59.5, -28))
            Line((59.5, -28), (59.5, -31))
            Line((59.5, -31), (63.5, -31))
        make_face()
    extrude(amount=MIRROR1_11_DEPTH)

    # Mirror1 12 outline → Mirror1 12 (add)
    with BuildSketch(Plane(origin=(0, 0, 0), x_dir=(1, 0, 0), z_dir=(0, 1, 0)).offset(MIRROR1_START_4)):
        with BuildLine():
            Line((59.5, 28), (65.5, 28))
            Line((65.5, 28), (65.5, 29))
            ThreePointArc((65.5, 29), (64.914213562, 30.414213562), (63.5, 31))
            Line((63.5, 31), (59.5, 31))
            Line((59.5, 31), (59.5, 28))
        make_face()
        with BuildLine():
            ThreePointArc((63.5, -31), (64.914213562, -30.414213562), (65.5, -29))
            Line((65.5, -29), (65.5, -28))
            Line((65.5, -28), (59.5, -28))
            Line((59.5, -28), (59.5, -31))
            Line((59.5, -31), (63.5, -31))
        make_face()
    extrude(amount=MIRROR1_12_DEPTH)

    # Fillet2
    fillet2_edges = [part.edges().sort_by_distance(p)[0] for p in [
        (80, 25, 0),
        (0, 25, -25),
        (-80, 25, 0),
        (0, -25, -25),
        (80, -25, 0),
        (0, -25, 25),
        (-80, -25, 0),
        (-80, 0, -25),
        (80, 0, -25),
        (80, 0, 25),
        (-80, 0, 25),
        (0, 25, 25),
    ]]
    fillet(fillet2_edges, radius=FILLET2_R)

    # Sketch5 → Cut-Extrude2 (cut, through all)
    with BuildSketch(Plane(origin=(0, 25, 0), x_dir=(1, 0, 0), z_dir=(0, 1, 0))):
        with Locations((-52.5, 0)):
            Rectangle(SKETCH5_W, SKETCH5_H)
    extrude(amount=CUT_EXTRUDE2_DEPTH, mode=Mode.SUBTRACT)


with BuildPart() as body_2:
    # Sketch6 → Boss-Extrude2 (new body)
    with BuildSketch(Plane(origin=(0, 25, 0), x_dir=(1, 0, 0), z_dir=(0, 1, 0))):
        with Locations((-34.830108153, 0)):
            Rectangle(SKETCH6_W, SKETCH6_H)
    extrude(amount=BOSS_EXTRUDE2_DEPTH)

    # Shell1
    shell1_openings = [body_2.faces().sort_by_distance(p)[0] for p in [
        (-34.830108153, 45, 0),
    ]]
    offset(amount=SHELL1_T, openings=shell1_openings, kind=Kind.INTERSECTION)


solid = Compound([part.part, body_2.part])
